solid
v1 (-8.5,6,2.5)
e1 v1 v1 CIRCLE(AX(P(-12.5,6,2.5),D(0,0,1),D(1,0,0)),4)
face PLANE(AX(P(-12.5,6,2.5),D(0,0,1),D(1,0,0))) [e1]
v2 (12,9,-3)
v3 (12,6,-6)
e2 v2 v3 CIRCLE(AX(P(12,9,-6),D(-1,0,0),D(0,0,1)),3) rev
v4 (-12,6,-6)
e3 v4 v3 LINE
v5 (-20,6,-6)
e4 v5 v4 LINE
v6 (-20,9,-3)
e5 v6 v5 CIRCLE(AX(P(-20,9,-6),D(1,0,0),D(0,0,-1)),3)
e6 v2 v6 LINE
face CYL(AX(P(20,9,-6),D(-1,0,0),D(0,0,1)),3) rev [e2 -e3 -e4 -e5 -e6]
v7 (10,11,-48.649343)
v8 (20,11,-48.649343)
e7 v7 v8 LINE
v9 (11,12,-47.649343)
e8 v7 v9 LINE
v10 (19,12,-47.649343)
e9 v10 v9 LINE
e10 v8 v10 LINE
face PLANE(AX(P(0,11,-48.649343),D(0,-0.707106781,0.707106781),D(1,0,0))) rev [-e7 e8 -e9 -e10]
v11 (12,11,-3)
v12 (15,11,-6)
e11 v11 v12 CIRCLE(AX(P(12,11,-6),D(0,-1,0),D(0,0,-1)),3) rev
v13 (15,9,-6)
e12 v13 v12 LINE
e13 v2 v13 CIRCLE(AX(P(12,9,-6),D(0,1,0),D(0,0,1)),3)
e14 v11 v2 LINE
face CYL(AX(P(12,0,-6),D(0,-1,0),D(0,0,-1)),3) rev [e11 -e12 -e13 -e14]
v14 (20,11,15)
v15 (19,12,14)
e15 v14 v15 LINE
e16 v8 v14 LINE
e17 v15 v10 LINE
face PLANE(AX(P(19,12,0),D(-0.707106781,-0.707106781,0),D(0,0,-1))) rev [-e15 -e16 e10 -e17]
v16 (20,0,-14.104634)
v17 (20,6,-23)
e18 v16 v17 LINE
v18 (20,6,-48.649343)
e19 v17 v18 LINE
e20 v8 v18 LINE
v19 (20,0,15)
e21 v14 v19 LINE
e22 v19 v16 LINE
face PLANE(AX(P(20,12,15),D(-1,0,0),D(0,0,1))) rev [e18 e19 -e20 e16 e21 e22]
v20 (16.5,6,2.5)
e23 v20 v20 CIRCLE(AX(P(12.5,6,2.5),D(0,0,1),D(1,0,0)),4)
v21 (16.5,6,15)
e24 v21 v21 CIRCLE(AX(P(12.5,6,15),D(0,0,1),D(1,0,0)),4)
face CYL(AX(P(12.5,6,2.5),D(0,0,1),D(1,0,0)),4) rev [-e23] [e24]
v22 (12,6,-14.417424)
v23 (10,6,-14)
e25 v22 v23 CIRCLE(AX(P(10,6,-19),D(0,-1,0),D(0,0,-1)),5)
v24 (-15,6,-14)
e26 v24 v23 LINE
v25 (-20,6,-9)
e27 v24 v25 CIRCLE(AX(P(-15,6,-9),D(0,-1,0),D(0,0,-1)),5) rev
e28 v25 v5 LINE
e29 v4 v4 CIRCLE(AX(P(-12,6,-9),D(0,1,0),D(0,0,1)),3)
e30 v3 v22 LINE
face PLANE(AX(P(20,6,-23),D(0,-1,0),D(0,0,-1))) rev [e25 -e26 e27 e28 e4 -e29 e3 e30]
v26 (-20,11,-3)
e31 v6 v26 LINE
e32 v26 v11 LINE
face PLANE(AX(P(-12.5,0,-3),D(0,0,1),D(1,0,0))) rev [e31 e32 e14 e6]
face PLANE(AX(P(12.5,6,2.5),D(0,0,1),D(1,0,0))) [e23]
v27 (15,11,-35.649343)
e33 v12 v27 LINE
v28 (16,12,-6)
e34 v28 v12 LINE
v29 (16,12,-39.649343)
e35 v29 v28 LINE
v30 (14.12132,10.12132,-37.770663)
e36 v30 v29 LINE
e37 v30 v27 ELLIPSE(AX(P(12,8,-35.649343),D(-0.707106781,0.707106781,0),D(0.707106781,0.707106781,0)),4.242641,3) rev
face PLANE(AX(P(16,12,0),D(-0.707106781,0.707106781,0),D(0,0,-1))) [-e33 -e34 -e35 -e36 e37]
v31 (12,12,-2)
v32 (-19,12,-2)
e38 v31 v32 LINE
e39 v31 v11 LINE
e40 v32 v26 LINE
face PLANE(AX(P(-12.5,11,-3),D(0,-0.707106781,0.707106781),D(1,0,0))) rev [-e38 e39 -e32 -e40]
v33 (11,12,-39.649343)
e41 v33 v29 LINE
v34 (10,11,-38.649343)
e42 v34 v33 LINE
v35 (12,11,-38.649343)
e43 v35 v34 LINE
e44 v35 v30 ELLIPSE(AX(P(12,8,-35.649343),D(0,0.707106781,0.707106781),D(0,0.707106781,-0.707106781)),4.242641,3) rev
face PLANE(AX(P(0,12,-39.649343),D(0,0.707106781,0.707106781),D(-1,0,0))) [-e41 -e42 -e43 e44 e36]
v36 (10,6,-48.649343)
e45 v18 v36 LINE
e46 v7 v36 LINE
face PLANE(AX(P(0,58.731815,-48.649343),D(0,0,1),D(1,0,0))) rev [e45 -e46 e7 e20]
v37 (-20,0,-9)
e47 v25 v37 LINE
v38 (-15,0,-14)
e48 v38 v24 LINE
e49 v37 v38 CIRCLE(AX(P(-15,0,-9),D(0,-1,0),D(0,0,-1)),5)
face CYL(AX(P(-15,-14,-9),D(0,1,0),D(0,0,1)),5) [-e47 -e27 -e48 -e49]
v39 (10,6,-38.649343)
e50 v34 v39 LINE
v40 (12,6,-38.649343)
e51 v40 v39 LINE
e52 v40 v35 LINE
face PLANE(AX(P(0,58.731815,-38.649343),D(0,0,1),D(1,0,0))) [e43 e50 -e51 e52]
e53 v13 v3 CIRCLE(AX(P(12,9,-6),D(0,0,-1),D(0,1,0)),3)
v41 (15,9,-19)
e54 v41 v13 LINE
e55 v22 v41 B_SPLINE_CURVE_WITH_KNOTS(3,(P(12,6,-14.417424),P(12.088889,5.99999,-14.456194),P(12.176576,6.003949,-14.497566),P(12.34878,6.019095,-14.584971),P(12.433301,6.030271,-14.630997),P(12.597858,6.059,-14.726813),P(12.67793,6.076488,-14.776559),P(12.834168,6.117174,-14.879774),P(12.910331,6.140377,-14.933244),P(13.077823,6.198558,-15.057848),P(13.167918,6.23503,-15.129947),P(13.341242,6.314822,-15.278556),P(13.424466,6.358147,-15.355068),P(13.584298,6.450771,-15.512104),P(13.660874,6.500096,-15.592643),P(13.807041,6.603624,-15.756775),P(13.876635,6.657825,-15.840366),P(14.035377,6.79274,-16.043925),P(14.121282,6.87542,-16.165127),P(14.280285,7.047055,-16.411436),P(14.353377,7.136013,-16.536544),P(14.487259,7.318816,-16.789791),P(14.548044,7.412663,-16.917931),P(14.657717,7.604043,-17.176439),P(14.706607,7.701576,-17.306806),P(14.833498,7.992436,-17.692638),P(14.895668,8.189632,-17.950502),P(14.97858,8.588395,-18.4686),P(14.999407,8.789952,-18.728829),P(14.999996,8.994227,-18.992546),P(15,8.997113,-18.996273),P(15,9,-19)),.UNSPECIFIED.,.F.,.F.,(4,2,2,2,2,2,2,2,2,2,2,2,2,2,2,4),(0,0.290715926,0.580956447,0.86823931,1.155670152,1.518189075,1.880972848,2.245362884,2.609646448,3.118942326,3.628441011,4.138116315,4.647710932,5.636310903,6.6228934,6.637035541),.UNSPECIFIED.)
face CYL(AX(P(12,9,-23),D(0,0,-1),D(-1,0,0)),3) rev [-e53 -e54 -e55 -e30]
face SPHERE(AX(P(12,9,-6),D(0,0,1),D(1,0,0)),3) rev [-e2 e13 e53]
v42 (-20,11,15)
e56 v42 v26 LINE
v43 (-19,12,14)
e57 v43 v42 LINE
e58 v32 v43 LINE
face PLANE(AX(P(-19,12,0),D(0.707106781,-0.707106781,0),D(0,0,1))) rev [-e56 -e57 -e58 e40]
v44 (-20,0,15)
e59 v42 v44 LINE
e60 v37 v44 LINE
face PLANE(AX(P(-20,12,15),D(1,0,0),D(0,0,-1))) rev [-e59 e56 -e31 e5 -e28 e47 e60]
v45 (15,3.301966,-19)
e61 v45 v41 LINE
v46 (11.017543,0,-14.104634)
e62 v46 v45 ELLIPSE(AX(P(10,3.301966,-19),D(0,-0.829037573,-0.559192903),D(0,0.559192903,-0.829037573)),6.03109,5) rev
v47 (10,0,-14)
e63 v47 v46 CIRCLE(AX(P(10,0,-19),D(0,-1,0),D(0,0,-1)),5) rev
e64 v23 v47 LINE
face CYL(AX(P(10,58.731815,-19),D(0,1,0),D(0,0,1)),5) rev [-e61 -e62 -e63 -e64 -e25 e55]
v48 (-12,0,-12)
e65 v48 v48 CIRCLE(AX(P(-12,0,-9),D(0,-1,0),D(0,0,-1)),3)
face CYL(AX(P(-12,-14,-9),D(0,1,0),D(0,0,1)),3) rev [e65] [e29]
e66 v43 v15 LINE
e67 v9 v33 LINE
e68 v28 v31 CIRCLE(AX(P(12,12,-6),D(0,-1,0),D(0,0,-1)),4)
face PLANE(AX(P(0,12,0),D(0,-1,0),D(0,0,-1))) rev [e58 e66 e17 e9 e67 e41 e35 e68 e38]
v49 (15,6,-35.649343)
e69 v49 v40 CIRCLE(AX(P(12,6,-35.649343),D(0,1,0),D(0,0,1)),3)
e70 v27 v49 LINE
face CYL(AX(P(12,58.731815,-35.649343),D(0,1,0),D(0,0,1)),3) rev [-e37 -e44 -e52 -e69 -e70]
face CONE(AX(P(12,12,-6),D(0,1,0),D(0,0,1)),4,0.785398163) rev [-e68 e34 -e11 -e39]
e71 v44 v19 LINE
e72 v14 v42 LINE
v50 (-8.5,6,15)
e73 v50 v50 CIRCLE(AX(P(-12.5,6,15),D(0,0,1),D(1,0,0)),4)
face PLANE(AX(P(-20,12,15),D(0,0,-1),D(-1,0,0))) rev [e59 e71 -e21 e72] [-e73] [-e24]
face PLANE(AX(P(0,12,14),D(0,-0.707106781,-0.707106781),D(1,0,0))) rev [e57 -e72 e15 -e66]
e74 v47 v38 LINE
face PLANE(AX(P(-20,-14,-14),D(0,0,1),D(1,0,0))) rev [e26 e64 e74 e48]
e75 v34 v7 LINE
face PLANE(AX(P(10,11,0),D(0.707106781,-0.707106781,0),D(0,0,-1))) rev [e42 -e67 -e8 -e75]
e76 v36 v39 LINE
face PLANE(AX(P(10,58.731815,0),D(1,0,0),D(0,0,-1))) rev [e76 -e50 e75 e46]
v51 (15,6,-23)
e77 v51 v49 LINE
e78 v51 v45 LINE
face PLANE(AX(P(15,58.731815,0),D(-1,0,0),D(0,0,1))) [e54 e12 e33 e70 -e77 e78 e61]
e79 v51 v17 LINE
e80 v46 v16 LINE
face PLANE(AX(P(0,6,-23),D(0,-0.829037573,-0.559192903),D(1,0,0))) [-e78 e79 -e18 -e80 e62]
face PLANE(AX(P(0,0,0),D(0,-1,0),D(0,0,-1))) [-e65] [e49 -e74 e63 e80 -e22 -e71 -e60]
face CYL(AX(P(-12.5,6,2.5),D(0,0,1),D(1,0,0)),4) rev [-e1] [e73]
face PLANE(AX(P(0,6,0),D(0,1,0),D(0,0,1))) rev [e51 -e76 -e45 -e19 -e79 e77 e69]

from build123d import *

# Parameters (mm, degrees)
SKETCH1_W           = 40
SKETCH1_H           = 30
BOSS_EXTRUDE1_DEPTH = 12
SKETCH2_W           = 25
SKETCH2_H           = 12
CUT_EXTRUDE1_DEPTH  = 12
SKETCH3_R           = 4
CUT_EXTRUDE2_DEPTH  = 100
FILLET1_R           = 5
SKETCH4_R           = 4
CUT_EXTRUDE3_DEPTH  = 12.5
SKETCH6_W           = 44.346855167
SKETCH6_H           = 29.153227126
CUT_EXTRUDE4_DEPTH  = 100
SKETCH7_W           = 40
SKETCH7_H           = 6
BOSS_EXTRUDE2_DEPTH = 20
SKETCH8_W           = 5
SKETCH8_H           = 20
SKETCH8_H_2         = 10
BOSS_EXTRUDE3_DEPTH = 6
SKETCH9_R           = 3
SKETCH9_W           = 35
SKETCH9_H           = 9
CUT_EXTRUDE5_DEPTH  = 20
CHAMFER2_SIZE2      = 6
CHAMFER2_SIZE       = 8.895365811
FILLET2_R           = 5
FILLET3_R           = 3
CHAMFER3_SIZE       = 1
FILLET4_R           = 3


with BuildPart() as part:
    # Sketch1 → Boss-Extrude1 (new body)
    with BuildSketch(Plane(origin=(0, 0, 0), x_dir=(1, 0, 0), z_dir=(0, 1, 0))):
        Rectangle(SKETCH1_W, SKETCH1_H)
    extrude(amount=BOSS_EXTRUDE1_DEPTH)

    # Sketch2 → Cut-Extrude1 (cut)
    with BuildSketch(Plane(origin=(0, 12, 0), x_dir=(1, 0, 0), z_dir=(0, 1, 0))):
        with Locations((0, 9)):
            Rectangle(SKETCH2_W, SKETCH2_H)
    extrude(amount=-CUT_EXTRUDE1_DEPTH, mode=Mode.SUBTRACT)

    # Sketch3 → Cut-Extrude2 (cut)
    with BuildSketch(Plane(origin=(20, 0, 0), x_dir=(0, 0, -1), z_dir=(1, 0, 0))):
        with Locations((9, 6)):
            Circle(SKETCH3_R)
    extrude(amount=-CUT_EXTRUDE2_DEPTH, mode=Mode.SUBTRACT)

    # Fillet1
    fillet1_edges = [part.edges().sort_by_distance(p)[0] for p in [
        (-16.25, 0, -15),
        (-16.25, 12, -15),
        (16.25, 0, -15),
        (16.25, 12, -15),
    ]]
    fillet(fillet1_edges, radius=FILLET1_R)

    # Sketch4 → Cut-Extrude3 (cut)
    with BuildSketch(Plane.XY.offset(15)):
        with Locations((-12.5, 6)):
            Circle(SKETCH4_R)
        with Locations((12.5, 6)):
            Circle(SKETCH4_R)
    extrude(amount=-CUT_EXTRUDE3_DEPTH, mode=Mode.SUBTRACT)

    # Sketch6 → Cut-Extrude4 (cut)
    with BuildSketch(Plane(origin=(0, 12, 0), x_dir=(1, 0, 0), z_dir=(0, 1, 0))):
        with Locations((2.173427584, 17.576613563)):
            Rectangle(SKETCH6_W, SKETCH6_H)
    extrude(amount=-CUT_EXTRUDE4_DEPTH, mode=Mode.SUBTRACT)

    # Sketch7 → Boss-Extrude2 (add)
    with BuildSketch(Plane(origin=(0, 0, -3), x_dir=(-1, 0, 0), z_dir=(0, 0, -1))):
        with Locations((0, 3)):
            Rectangle(SKETCH7_W, SKETCH7_H)
    extrude(amount=BOSS_EXTRUDE2_DEPTH)

    # Sketch8 → Boss-Extrude3 (add)
    with BuildSketch(Plane(origin=(0, 6, 0), x_dir=(1, 0, 0), z_dir=(0, 1, 0))):
        Polygon((15, 23), (20, 23), (20, 48.649342911), (15, 48.649342911), (15, 38.649342911), align=None)
        with Locations((17.5, 13)):
            Rectangle(SKETCH8_W, SKETCH8_H)
        with Locations((12.5, 43.649342911)):
            Rectangle(SKETCH8_W, SKETCH8_H_2)
    extrude(amount=BOSS_EXTRUDE3_DEPTH)

    # Sketch9 → Cut-Extrude5 (cut)
    with BuildSketch(Plane(origin=(0, 6, 0), x_dir=(1, 0, 0), z_dir=(0, 1, 0))):
        with Locations(Location((-12, 9, 0), (0, 0, 270))):
            Circle(SKETCH9_R)
        with Locations((-2.5, 18.5)):
            Rectangle(SKETCH9_W, SKETCH9_H)
    extrude(amount=-CUT_EXTRUDE5_DEPTH, mode=Mode.SUBTRACT)

    # Chamfer2
    chamfer2_edges = [part.edges().sort_by_distance(p)[0] for p in [
        (17.5, 0, -23),
    ]]
    chamfer2_side = [part.faces().sort_by_distance(p)[0] for p in [
        (17.5, 0, -22.88),
    ]]
    chamfer(chamfer2_edges, length=CHAMFER2_SIZE - 0.0001, length2=CHAMFER2_SIZE2 - 0.0001, reference=chamfer2_side[0])  # a hair under: the kernel refuses the full size

    # Fillet2
    fillet2_edges = [part.edges().sort_by_distance(p)[0] for p in [
        (-20, 3, -14),
        (15, 3, -14),
    ]]
    fillet(fillet2_edges, radius=FILLET2_R)

    # Fillet3
    fillet3_edges = [part.edges().sort_by_distance(p)[0] for p in [
        (-2.5, 6, -3),
        (15, 6, -11),
        (15, 9, -3),
    ]]
    fillet(fillet3_edges, radius=FILLET3_R - 0.0001)  # a hair under: the kernel refuses the full size

    # Chamfer3
    chamfer3_edges = [part.edges().sort_by_distance(p)[0] for p in [
        (15, 12, -48.649342911),
        (10, 12, -43.649342911),
        (15, 12, -22.324621456),
        (12.5, 12, -38.649342911),
        (0, 12, 15),
        (14.121349633, 12, -3.878650367),
        (-3.99995, 12, -3),
        (20, 12, -16.824671456),
        (-20, 12, 6),
    ]]
    chamfer(chamfer3_edges, length=CHAMFER3_SIZE)

    # Fillet4
    fillet4_edges = [part.edges().sort_by_distance(p)[0] for p in [
        (15, 8.5, -38.649342911),
    ]]
    fillet(fillet4_edges, radius=FILLET4_R)


solid = part.part
